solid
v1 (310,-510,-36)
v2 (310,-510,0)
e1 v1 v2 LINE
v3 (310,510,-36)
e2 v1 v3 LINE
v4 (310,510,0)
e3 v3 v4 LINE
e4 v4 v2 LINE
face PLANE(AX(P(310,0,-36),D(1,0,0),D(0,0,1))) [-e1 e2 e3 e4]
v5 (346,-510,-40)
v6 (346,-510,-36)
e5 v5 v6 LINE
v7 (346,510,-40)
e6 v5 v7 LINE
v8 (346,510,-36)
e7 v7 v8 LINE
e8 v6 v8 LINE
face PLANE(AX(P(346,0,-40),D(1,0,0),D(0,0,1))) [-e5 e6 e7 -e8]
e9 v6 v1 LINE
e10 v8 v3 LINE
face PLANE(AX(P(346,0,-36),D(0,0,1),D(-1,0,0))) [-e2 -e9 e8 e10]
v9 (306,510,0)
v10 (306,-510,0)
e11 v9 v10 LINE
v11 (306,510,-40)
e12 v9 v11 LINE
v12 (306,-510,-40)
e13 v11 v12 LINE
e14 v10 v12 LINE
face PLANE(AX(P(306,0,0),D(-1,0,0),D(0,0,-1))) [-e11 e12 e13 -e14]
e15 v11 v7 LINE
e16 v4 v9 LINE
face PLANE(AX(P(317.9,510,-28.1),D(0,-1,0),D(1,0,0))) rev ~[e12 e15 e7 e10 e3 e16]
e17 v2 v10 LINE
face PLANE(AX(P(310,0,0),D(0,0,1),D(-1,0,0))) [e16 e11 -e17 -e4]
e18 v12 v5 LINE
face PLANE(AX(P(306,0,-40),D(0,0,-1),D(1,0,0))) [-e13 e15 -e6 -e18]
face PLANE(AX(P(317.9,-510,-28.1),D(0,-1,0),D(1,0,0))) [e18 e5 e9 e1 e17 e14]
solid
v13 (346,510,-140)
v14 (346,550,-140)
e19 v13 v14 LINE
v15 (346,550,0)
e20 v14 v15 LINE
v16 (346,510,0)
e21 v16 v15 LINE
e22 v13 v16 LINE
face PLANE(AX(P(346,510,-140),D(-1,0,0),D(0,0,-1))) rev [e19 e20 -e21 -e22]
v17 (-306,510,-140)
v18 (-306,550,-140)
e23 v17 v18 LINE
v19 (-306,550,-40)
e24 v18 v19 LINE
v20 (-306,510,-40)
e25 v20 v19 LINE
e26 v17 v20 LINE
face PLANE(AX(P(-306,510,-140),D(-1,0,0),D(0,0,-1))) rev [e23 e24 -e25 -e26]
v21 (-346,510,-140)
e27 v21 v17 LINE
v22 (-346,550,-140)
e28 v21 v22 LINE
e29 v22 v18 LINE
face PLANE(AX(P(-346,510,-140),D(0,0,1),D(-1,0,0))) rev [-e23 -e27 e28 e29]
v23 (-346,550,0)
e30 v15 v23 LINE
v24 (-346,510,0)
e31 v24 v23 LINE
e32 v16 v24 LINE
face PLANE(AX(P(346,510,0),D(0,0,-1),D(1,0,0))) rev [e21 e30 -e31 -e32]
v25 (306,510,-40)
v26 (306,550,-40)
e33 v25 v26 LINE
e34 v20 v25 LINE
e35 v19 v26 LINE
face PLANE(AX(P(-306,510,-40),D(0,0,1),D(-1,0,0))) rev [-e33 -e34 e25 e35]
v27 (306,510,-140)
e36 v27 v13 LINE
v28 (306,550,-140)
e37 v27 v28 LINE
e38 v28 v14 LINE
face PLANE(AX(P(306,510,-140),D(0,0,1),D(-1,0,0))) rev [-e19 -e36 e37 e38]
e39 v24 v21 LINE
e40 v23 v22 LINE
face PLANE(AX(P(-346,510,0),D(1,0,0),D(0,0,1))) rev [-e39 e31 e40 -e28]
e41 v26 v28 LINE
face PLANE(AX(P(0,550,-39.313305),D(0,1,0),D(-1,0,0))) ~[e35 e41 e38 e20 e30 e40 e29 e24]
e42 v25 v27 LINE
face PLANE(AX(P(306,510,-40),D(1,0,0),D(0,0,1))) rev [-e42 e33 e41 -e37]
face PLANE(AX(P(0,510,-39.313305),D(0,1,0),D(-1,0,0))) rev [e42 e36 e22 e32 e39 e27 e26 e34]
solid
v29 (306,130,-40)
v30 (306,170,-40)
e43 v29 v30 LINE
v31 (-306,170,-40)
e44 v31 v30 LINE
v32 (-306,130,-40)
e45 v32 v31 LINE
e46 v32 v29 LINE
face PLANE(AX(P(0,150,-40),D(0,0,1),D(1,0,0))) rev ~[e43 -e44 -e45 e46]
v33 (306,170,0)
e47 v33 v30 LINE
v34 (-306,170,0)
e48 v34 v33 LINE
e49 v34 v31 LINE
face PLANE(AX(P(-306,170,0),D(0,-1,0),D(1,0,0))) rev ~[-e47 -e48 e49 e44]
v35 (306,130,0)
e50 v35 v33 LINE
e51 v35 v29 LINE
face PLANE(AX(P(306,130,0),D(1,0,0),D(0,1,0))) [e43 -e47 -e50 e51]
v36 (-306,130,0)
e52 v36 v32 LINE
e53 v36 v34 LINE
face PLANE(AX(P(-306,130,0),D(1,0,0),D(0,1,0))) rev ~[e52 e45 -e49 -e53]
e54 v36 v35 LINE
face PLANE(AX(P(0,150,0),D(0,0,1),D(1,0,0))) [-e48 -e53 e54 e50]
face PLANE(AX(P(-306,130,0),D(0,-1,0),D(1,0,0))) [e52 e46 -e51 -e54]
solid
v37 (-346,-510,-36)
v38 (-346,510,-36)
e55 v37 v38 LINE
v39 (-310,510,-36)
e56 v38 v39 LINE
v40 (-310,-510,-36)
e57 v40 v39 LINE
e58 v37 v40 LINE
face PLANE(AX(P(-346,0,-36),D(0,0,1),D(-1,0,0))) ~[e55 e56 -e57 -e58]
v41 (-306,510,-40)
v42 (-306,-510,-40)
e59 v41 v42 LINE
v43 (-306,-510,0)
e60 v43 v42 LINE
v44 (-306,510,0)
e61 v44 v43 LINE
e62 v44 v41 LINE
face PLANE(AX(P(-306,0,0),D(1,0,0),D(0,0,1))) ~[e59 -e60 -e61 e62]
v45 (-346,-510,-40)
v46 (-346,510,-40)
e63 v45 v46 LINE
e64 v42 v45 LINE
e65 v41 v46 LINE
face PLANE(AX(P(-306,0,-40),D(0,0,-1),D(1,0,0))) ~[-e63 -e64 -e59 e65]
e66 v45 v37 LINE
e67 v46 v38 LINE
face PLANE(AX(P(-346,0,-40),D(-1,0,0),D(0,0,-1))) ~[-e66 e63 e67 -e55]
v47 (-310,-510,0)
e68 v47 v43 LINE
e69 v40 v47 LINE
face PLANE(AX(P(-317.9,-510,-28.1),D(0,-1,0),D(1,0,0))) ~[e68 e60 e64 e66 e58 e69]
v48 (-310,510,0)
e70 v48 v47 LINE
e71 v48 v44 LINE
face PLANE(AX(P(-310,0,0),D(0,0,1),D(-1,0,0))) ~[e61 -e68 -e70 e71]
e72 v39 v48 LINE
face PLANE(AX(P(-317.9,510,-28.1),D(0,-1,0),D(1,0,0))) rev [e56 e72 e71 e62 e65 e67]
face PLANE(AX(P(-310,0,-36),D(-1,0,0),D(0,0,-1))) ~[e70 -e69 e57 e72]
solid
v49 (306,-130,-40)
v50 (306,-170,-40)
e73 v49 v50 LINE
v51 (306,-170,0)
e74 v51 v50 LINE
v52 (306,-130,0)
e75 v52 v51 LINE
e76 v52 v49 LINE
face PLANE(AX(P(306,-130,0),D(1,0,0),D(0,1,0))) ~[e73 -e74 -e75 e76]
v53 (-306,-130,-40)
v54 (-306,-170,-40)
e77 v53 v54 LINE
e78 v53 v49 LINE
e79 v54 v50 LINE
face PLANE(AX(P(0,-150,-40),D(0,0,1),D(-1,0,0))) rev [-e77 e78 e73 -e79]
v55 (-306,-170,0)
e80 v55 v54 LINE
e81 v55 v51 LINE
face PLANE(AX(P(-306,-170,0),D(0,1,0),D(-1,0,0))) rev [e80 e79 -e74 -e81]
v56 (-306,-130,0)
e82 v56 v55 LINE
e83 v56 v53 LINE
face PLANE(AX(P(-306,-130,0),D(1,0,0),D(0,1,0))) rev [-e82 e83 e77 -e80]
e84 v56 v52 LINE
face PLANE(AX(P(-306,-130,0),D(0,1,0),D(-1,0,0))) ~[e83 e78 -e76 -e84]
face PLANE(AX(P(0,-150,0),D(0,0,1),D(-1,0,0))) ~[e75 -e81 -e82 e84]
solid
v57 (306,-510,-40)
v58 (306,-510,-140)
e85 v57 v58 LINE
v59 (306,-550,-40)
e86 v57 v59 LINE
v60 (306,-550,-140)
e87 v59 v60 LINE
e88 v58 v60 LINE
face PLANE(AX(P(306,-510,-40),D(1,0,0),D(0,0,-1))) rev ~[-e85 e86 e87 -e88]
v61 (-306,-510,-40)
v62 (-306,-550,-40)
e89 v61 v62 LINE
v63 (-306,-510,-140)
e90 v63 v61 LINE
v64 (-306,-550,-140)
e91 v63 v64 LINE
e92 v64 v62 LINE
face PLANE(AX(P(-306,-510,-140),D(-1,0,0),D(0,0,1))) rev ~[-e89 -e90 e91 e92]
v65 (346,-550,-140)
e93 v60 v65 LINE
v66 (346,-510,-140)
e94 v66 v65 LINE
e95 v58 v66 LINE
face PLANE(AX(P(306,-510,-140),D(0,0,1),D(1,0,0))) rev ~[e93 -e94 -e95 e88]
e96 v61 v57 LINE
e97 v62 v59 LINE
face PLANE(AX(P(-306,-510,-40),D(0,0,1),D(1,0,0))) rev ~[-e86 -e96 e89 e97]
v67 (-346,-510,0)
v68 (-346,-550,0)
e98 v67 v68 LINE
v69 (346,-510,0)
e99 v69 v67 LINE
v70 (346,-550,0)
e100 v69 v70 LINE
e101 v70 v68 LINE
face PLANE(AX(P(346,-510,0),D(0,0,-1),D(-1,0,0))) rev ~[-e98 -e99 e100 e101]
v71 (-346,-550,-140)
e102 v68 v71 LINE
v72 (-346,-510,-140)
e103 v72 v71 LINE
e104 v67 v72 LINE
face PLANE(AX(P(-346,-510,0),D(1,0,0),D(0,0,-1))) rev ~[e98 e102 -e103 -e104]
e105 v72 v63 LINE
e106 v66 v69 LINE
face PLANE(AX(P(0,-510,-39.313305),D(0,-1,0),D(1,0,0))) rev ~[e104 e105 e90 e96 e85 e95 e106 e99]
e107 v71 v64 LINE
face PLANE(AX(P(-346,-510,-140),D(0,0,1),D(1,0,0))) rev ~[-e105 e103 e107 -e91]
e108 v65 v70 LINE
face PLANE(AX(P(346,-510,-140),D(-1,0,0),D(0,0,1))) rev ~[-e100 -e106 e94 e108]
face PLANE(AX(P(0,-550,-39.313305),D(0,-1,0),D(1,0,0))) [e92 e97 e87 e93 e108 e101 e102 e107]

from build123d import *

# Parameters (mm, degrees)
F1_DEPTH = 510
F3_DEPTH = 40
F4_W     = 612
F4_H     = 40
F5_DEPTH = 40


# Not quite as in the source:
# - a pattern or mirror of a feature is missing from the dataset's text; its kind, count and spacing are read off the source's solid


with BuildPart() as f1:
    # F0 (on Front) → F1 (new body, symmetric)
    with BuildSketch(Plane.XZ):
        Polygon((310, -36), (310, 0), (306, 0), (306, -40), (346, -40), (346, -36), align=None)
    extrude(amount=F1_DEPTH, both=True)


with BuildPart() as f1_copies_1:
    # F1_copies: instance of F1
    add(f1.part.mirror(Plane(origin=(0, 0, 0), x_dir=(0, 0, -1), z_dir=(-1, 0, 0))))


with BuildPart() as f3:
    # F2 (on face) → F3 (new body)
    with BuildSketch(Plane.XZ.offset(510)):
        Polygon((-306, -40), (306, -40), (306, -140), (346, -140), (346, 0), (-346, 0), (-346, -140), (-306, -140), align=None)
    extrude(amount=F3_DEPTH)


with BuildPart() as f3_copies_1:
    # F3_copies: instance of F3
    add(f3.part.mirror(Plane.ZX))


with BuildPart() as f5:
    # F4 (on face) → F5 (new body)
    with BuildSketch(Plane.XY):
        with Locations((0, 150)):
            Rectangle(F4_W, F4_H)
    extrude(amount=-F5_DEPTH)


with BuildPart() as f5_copies_1:
    # F5_copies: instance of F5
    add(f5.part.mirror(Plane(origin=(0, 0, 0), x_dir=(0, 0, -1), z_dir=(0, -1, 0))))


solid = Compound([f1.part, f1_copies_1.part, f3.part, f3_copies_1.part, f5.part, f5_copies_1.part])
